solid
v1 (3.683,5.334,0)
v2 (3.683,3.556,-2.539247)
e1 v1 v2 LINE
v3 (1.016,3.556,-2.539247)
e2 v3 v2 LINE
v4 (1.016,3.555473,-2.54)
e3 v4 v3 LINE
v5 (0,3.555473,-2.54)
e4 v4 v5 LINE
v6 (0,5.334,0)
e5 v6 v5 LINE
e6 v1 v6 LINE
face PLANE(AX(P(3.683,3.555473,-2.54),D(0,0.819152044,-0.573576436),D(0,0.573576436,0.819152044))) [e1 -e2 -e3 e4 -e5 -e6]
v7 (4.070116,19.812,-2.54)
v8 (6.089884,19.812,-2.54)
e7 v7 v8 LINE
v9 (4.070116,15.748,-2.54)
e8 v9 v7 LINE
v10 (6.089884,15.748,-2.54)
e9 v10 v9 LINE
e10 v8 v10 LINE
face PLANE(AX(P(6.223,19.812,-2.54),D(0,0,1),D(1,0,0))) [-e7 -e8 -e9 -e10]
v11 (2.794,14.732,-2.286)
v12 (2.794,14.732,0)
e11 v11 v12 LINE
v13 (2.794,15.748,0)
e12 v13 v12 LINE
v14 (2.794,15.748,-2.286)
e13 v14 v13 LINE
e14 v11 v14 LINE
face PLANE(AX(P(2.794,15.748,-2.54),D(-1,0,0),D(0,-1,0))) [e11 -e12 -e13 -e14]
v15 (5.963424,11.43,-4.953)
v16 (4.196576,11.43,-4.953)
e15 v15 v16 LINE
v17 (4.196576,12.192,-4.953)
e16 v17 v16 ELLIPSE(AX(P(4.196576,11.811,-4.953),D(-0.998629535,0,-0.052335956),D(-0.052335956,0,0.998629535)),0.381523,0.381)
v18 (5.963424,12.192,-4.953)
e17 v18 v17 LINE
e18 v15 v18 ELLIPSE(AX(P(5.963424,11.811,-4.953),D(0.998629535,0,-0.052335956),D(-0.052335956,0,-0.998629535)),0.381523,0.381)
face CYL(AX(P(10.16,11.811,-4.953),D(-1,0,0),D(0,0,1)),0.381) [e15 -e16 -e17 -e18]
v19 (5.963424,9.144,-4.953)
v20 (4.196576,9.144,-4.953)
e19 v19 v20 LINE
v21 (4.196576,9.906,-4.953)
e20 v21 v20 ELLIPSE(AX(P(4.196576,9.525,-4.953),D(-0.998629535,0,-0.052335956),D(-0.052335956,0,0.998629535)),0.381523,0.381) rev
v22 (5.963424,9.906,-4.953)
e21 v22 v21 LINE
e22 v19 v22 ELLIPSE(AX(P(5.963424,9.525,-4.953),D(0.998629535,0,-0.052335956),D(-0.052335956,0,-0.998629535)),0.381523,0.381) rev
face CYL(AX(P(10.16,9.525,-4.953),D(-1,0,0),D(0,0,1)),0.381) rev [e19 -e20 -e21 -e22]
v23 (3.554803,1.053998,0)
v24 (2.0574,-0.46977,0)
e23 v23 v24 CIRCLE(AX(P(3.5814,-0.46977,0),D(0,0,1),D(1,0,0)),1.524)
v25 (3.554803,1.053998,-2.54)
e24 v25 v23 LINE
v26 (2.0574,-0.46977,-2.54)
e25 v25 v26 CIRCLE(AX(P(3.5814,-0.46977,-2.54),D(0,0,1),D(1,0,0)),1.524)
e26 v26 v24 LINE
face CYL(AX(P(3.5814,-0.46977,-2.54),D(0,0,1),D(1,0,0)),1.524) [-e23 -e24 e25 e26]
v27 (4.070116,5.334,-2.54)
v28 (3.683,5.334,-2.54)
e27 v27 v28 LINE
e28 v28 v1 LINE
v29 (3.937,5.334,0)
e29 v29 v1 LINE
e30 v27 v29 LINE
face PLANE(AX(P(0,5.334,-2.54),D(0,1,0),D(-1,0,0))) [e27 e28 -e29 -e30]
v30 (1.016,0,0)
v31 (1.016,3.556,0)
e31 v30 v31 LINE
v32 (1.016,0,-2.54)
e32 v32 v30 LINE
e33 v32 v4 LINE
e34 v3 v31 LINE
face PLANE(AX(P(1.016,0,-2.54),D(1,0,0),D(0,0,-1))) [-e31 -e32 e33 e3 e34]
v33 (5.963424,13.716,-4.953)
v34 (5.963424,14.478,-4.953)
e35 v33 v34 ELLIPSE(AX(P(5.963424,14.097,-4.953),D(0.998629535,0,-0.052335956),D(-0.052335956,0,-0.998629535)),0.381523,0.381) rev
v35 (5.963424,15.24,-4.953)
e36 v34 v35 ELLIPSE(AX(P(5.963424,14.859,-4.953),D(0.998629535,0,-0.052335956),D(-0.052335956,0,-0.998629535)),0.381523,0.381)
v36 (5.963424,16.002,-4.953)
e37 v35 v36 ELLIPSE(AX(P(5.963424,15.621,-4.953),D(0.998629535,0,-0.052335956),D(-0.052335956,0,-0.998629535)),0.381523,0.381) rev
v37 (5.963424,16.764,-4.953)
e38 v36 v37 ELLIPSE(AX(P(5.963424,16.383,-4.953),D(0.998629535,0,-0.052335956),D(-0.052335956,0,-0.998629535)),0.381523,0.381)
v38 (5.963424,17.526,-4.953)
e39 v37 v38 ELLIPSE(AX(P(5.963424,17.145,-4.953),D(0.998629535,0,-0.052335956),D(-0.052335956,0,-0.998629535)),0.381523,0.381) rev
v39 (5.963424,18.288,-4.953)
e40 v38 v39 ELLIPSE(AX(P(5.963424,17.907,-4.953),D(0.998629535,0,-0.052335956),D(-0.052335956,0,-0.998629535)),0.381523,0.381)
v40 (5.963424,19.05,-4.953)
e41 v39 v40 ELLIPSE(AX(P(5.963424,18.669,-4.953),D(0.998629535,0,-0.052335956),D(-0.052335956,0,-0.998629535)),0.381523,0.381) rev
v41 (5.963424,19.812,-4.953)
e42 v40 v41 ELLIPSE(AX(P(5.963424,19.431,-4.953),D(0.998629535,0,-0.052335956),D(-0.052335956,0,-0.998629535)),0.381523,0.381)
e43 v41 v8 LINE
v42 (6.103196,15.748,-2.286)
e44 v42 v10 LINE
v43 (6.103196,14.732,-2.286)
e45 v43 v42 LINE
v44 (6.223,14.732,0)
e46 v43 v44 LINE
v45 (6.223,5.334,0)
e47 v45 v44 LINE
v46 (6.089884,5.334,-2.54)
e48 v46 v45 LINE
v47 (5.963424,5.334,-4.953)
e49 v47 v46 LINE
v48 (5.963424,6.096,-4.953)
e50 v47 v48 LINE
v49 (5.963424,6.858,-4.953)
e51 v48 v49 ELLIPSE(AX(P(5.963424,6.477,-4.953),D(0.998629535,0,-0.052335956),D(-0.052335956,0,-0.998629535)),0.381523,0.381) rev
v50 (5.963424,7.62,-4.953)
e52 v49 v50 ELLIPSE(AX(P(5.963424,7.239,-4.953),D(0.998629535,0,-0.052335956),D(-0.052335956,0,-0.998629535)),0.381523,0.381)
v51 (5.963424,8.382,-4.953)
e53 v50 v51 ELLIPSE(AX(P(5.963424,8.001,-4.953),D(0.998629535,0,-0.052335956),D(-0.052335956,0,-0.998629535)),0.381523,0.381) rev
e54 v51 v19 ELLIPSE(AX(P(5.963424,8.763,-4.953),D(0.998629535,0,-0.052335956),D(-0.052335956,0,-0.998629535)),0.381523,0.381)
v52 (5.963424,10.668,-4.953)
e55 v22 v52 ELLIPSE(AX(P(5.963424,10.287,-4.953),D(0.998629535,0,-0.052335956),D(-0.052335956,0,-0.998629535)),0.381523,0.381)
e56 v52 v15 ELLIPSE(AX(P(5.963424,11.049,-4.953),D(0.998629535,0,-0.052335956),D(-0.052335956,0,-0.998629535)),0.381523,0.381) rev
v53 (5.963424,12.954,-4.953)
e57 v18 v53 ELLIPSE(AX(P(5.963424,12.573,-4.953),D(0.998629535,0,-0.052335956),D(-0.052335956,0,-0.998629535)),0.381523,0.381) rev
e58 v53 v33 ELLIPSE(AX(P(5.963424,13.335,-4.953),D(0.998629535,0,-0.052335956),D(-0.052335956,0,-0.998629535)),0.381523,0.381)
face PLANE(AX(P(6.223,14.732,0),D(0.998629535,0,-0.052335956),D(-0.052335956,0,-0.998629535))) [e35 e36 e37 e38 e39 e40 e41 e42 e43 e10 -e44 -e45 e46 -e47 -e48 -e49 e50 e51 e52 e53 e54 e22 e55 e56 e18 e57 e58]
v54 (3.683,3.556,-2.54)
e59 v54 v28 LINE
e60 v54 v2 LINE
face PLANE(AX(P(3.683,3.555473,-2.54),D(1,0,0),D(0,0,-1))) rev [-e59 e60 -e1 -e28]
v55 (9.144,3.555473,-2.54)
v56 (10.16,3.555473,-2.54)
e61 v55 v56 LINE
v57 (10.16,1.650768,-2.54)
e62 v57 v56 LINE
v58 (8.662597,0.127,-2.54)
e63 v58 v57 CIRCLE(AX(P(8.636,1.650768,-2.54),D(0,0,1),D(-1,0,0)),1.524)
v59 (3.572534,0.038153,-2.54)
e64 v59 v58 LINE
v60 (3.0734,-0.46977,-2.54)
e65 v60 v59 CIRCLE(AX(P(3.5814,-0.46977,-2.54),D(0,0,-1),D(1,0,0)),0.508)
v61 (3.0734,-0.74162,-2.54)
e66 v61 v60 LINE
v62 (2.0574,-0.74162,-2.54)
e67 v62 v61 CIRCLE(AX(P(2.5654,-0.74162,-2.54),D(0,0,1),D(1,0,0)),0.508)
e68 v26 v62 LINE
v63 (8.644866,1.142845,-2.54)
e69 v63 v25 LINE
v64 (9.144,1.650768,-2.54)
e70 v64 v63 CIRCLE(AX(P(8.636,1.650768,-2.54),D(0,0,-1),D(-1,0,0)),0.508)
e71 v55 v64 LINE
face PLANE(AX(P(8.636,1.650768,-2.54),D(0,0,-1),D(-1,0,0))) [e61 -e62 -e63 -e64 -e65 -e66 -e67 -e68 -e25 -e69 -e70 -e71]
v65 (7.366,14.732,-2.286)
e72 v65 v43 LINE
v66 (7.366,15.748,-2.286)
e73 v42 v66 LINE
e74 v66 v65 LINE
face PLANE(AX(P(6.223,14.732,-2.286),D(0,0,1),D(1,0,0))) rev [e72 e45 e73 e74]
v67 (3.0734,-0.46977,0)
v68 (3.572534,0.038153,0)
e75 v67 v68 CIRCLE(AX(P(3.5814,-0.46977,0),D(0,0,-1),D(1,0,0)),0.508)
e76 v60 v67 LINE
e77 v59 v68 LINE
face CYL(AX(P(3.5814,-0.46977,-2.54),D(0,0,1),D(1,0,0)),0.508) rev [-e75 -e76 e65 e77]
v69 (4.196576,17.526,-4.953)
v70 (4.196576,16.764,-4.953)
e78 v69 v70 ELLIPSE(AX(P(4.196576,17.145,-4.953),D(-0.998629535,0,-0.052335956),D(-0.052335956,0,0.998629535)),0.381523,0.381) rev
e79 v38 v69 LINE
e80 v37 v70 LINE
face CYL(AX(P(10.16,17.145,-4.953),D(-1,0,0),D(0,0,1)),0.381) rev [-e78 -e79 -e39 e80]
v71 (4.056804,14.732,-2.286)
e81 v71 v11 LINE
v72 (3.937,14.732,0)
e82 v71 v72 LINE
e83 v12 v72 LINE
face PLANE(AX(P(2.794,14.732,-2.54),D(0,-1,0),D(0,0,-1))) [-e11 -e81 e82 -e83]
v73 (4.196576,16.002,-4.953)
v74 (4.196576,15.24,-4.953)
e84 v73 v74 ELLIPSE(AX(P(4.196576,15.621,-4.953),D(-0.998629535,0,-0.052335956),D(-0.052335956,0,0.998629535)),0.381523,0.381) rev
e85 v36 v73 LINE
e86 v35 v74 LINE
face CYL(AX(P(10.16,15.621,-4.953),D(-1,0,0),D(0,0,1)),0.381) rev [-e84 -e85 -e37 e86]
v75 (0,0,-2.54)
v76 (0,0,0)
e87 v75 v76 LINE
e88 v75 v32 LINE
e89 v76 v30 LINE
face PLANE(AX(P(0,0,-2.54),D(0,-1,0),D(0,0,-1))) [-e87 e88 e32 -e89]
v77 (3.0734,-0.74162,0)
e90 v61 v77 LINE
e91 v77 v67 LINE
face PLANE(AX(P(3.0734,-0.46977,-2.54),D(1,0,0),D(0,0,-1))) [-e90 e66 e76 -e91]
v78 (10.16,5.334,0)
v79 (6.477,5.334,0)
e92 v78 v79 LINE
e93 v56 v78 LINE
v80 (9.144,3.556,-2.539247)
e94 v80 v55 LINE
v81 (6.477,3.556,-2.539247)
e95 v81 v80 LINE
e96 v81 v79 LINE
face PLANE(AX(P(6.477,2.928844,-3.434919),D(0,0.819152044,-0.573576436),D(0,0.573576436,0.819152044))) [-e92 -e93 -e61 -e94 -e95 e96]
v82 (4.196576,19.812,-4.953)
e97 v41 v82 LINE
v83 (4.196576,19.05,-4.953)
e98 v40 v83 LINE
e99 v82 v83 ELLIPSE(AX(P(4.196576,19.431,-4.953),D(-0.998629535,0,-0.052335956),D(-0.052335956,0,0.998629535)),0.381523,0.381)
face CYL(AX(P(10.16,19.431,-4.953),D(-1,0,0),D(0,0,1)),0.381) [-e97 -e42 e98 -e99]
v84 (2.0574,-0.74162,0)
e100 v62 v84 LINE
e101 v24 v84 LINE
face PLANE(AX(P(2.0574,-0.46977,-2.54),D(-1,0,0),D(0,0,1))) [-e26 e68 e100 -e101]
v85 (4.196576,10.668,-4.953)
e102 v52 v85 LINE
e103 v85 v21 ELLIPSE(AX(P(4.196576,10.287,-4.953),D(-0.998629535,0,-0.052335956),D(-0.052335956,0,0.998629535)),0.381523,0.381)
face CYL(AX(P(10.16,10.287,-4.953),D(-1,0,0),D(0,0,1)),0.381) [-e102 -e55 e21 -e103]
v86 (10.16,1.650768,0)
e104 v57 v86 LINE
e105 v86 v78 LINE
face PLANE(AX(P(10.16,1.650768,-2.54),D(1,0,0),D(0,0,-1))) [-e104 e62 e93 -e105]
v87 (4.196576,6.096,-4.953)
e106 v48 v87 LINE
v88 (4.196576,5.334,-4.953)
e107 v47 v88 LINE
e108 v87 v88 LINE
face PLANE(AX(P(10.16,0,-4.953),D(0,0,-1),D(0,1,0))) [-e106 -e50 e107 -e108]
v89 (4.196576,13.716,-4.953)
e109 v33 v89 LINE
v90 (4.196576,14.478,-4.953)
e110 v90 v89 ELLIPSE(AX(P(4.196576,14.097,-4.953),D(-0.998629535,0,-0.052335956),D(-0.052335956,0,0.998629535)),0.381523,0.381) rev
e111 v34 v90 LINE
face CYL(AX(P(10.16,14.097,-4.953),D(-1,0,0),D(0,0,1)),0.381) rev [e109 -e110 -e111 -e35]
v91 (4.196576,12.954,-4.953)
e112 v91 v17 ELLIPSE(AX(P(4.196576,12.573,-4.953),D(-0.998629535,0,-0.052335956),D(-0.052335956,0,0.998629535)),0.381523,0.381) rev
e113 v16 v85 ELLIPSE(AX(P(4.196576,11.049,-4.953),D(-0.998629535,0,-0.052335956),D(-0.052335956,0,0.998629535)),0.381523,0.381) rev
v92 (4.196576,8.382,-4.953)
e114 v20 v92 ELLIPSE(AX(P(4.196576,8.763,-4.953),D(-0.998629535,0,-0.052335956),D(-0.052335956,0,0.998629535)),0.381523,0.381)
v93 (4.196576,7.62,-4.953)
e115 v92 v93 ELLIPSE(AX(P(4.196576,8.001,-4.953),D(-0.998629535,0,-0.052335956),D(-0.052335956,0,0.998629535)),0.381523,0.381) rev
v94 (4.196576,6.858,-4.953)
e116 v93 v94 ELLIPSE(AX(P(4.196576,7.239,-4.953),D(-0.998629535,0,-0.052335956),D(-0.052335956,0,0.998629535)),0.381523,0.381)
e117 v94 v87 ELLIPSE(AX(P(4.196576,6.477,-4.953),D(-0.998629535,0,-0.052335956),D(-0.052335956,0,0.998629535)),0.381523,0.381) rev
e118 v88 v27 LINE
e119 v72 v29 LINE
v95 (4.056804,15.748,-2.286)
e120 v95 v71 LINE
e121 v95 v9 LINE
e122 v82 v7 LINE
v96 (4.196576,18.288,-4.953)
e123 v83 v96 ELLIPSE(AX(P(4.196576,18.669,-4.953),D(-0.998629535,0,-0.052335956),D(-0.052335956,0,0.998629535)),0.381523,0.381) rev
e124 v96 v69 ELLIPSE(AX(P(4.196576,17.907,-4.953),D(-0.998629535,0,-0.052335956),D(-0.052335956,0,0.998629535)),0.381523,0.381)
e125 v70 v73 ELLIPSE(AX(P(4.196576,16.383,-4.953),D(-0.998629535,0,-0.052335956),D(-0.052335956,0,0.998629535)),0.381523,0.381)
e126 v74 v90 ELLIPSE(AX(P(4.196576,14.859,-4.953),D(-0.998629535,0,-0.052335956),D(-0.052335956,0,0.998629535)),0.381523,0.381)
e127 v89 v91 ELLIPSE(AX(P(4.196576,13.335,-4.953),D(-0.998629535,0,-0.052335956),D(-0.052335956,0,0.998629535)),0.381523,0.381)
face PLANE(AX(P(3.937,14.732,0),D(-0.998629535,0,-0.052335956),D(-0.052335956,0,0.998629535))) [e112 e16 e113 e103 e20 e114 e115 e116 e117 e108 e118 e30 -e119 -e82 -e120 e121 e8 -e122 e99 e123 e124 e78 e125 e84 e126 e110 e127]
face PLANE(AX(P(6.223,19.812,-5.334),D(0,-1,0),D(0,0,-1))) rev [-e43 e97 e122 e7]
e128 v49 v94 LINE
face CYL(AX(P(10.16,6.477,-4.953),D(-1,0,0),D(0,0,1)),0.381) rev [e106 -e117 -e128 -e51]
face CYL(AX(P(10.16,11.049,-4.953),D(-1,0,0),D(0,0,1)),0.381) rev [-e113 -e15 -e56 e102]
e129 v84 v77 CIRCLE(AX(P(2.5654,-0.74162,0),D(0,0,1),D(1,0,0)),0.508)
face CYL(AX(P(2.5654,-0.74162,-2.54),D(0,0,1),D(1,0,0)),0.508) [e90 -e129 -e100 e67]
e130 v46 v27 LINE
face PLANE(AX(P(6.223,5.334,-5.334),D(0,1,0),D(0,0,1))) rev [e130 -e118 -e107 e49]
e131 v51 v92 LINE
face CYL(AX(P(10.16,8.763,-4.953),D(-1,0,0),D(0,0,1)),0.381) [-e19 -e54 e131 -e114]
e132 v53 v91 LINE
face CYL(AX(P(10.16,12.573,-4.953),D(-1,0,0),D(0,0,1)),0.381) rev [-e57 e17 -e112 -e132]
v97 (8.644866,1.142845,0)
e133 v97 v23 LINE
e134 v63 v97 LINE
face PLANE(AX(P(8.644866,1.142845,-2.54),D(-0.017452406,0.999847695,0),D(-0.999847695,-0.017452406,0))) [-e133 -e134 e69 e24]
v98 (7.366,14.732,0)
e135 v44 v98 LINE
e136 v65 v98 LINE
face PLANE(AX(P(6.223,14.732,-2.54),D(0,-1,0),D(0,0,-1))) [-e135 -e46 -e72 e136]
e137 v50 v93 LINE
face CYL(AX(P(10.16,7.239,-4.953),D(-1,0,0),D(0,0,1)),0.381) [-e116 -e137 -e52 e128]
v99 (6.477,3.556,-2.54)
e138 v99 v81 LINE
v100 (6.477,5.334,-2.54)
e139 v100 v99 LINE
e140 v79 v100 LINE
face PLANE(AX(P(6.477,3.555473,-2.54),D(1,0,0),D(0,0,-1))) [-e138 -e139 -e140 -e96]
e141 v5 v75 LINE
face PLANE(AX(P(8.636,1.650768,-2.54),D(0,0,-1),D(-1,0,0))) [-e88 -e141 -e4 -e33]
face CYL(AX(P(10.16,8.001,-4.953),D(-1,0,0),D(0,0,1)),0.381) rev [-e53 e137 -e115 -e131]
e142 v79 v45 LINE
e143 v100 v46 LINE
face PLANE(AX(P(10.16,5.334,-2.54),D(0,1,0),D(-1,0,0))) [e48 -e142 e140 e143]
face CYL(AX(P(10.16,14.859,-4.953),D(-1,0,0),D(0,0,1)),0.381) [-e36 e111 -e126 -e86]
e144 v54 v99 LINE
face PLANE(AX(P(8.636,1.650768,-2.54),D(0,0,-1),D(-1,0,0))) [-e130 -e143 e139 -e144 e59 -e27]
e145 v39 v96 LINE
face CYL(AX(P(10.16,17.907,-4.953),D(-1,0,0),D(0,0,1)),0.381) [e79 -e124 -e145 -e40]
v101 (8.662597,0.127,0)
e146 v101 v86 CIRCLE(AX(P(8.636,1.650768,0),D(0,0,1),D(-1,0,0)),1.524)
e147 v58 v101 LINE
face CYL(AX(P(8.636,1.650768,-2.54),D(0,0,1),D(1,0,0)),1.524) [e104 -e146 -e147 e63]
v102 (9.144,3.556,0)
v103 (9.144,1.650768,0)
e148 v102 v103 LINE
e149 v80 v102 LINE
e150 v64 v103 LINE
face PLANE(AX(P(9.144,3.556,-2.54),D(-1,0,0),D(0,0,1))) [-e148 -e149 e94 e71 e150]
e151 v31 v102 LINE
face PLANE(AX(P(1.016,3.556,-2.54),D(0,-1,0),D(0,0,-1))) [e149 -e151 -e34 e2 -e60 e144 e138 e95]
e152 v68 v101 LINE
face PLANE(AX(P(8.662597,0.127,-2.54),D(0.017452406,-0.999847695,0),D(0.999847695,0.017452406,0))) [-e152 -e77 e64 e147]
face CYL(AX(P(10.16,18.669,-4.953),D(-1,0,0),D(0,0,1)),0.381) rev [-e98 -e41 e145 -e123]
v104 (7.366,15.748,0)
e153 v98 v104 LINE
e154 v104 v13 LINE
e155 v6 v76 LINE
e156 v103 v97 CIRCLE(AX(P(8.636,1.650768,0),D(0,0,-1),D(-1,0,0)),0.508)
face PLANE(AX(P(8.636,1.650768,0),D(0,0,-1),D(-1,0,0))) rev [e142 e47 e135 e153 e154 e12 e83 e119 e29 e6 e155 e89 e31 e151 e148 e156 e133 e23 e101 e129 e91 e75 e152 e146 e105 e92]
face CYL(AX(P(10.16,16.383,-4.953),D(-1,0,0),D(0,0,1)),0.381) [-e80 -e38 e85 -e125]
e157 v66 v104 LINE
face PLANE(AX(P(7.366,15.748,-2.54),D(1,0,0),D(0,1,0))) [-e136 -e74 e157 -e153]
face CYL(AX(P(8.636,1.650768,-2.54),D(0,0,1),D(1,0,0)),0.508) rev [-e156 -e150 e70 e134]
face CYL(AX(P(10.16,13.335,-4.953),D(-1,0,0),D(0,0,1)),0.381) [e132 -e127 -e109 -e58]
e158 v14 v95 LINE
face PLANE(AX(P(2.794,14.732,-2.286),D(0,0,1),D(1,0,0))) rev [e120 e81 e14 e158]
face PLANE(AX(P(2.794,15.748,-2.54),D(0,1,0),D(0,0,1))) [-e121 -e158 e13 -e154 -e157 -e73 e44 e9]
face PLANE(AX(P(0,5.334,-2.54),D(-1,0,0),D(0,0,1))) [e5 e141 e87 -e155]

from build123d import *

# Parameters (mm, degrees)
BOSS_EXTRUDE1_DEPTH = 2.54
CUT_EXTRUDE2_DEPTH  = 3.683
CUT_EXTRUDE4_START  = 10.16
CUT_EXTRUDE4_DEPTH  = 3.683
SKETCH2_W           = 2.286
SKETCH2_H           = 14.478
BOSS_EXTRUDE2_DEPTH = 2.794
SKETCH3_W           = 1.143
SKETCH3_H           = 1.016
CUT_EXTRUDE5_DEPTH  = 0.254
DRAFT2_START        = 5.334
DRAFT2_DEPTH        = 14.478
DRAFT2_2_DEPTH      = 9.398
CUT_EXTRUDE6_DEPTH  = 23.895250599


# Read off the part's stored shape, not the designer's step: Draft2
with BuildPart() as part:
    # Model → Boss-Extrude1 (new body)
    with BuildSketch(Plane.XY):
        with BuildLine():
            Line((2.794, 15.748), (7.366, 15.748))
            Line((7.366, 15.748), (7.366, 14.732))
            Line((7.366, 14.732), (6.223, 14.732))
            Line((6.223, 14.732), (6.223, 5.334))
            Line((6.223, 5.334), (10.16, 5.334))
            Line((10.16, 5.334), (10.16, 1.650767887))
            ThreePointArc((10.16, 1.650767887), (9.722993685, 0.582582169), (8.662597467, 0.127))
            Line((8.662597467, 0.127), (3.572534178, 0.038152615))
            ThreePointArc((3.572534178, 0.038152615), (3.219068772, -0.113708108), (3.0734, -0.469770014))
            Line((3.0734, -0.469770014), (3.0734, -0.741620434))
            ThreePointArc((3.0734, -0.741620434), (2.5654, -1.249620434), (2.0574, -0.741620434))
            Line((2.0574, -0.741620434), (2.0574, -0.469770014))
            ThreePointArc((2.0574, -0.469770014), (2.494406315, 0.598415704), (3.554802533, 1.053997873))
            Line((3.554802533, 1.053997873), (8.644865822, 1.142845258))
            ThreePointArc((8.644865822, 1.142845258), (8.998331228, 1.294705981), (9.144, 1.650767887))
            Line((9.144, 1.650767887), (9.144, 3.556))
            Line((9.144, 3.556), (1.016, 3.556))
            Line((1.016, 3.556), (1.016, 0))
            Line((1.016, 0), (0, 0))
            Line((0, 0), (0, 5.334))
            Line((0, 5.334), (3.937, 5.334))
            Line((3.937, 5.334), (3.937, 14.732))
            Line((3.937, 14.732), (2.794, 14.732))
            Line((2.794, 14.732), (2.794, 15.748))
        make_face()
    extrude(amount=-BOSS_EXTRUDE1_DEPTH)

    # Sketch1 → Cut-Extrude2 (cut)
    with BuildSketch(Plane(origin=(0, 0, 0), x_dir=(0, 0, -1), z_dir=(1, 0, 0))):
        Polygon((0, 5.334), (2.54, 5.334), (2.54, 3.555472853), align=None)
    extrude(amount=CUT_EXTRUDE2_DEPTH, mode=Mode.SUBTRACT)

    # Sketch1<3> → Cut-Extrude4 (cut)
    with BuildSketch(Plane(origin=(0, 0, 0), x_dir=(0, 0, -1), z_dir=(1, 0, 0)).offset(CUT_EXTRUDE4_START)):
        Polygon((0, 5.334), (2.54, 5.334), (2.54, 3.555472853), align=None)
    extrude(amount=-CUT_EXTRUDE4_DEPTH, mode=Mode.SUBTRACT)

    # Sketch2 → Boss-Extrude2 (add)
    with BuildSketch(Plane(origin=(0, 0, -2.54), x_dir=(-1, 0, 0), z_dir=(0, 0, -1))):
        with Locations((-5.08, 12.573)):
            Rectangle(SKETCH2_W, SKETCH2_H)
    extrude(amount=BOSS_EXTRUDE2_DEPTH)

    # Sketch3 → Cut-Extrude5 (cut)
    with BuildSketch(Plane(origin=(0, 0, -2.54), x_dir=(-1, 0, 0), z_dir=(0, 0, -1))):
        with Locations((-6.7945, 15.24)):
            Rectangle(SKETCH3_W, SKETCH3_H)
        with Locations((-3.3655, 15.24)):
            Rectangle(SKETCH3_W, SKETCH3_H)
    extrude(amount=-CUT_EXTRUDE5_DEPTH, mode=Mode.SUBTRACT)

    # Draft2 outline → Draft2 (cut)
    with BuildSketch(Plane(origin=(0, 0, 0), x_dir=(1, 0, 0), z_dir=(0, 1, 0)).offset(DRAFT2_START)):
        Polygon((4.216543095, 5.334), (3.937, 5.334), (3.937, 2.286), (4.056804183, 2.286), align=None)
        Polygon((6.223, 5.334), (5.943456905, 5.334), (6.103195817, 2.286), (6.223, 2.286), align=None)
    extrude(amount=DRAFT2_DEPTH, mode=Mode.SUBTRACT)

    # Draft2 2 outline → Draft2 2 (cut)
    with BuildSketch(Plane(origin=(0, 0, 0), x_dir=(1, 0, 0), z_dir=(0, 1, 0)).offset(DRAFT2_START)):
        Polygon((3.937, 0), (4.056804184, 2.286), (3.937, 2.286), align=None)
        Polygon((6.223, 2.286), (6.103195817, 2.286), (6.223, 0), align=None)
    extrude(amount=DRAFT2_2_DEPTH, mode=Mode.SUBTRACT)

    # Sketch4 → Cut-Extrude6 (cut, through all)
    with BuildSketch(Plane(origin=(0, 0, 0), x_dir=(0, 0, -1), z_dir=(1, 0, 0))):
        with BuildLine():
            ThreePointArc((4.953, 19.812), (5.222407684, 19.700407684), (5.334, 19.431))
            Line((5.334, 19.431), (5.334, 19.812))
            Line((5.334, 19.812), (4.953, 19.812))
        make_face()
        with BuildLine():
            ThreePointArc((4.953, 18.288), (5.222407684, 18.176407684), (5.334, 17.907))
            Line((5.334, 17.907), (5.334, 19.431))
            ThreePointArc((5.334, 19.431), (5.222407684, 19.161592316), (4.953, 19.05))
            ThreePointArc((4.953, 19.05), (4.683592316, 18.938407684), (4.572, 18.669))
            ThreePointArc((4.572, 18.669), (4.683592316, 18.399592316), (4.953, 18.288))
        make_face()
        with BuildLine():
            ThreePointArc((4.953, 16.764), (5.222407684, 16.652407684), (5.334, 16.383))
            Line((5.334, 16.383), (5.334, 17.907))
            ThreePointArc((5.334, 17.907), (5.222407684, 17.637592316), (4.953, 17.526))
            ThreePointArc((4.953, 17.526), (4.683592316, 17.414407684), (4.572, 17.145))
            ThreePointArc((4.572, 17.145), (4.683592316, 16.875592316), (4.953, 16.764))
        make_face()
        with BuildLine():
            ThreePointArc((4.953, 15.24), (5.222407684, 15.128407684), (5.334, 14.859))
            Line((5.334, 14.859), (5.334, 16.383))
            ThreePointArc((5.334, 16.383), (5.222407684, 16.113592316), (4.953, 16.002))
            ThreePointArc((4.953, 16.002), (4.683592316, 15.890407684), (4.572, 15.621))
            ThreePointArc((4.572, 15.621), (4.683592316, 15.351592316), (4.953, 15.24))
        make_face()
        with BuildLine():
            ThreePointArc((4.953, 13.716), (5.222407684, 13.604407684), (5.334, 13.335))
            Line((5.334, 13.335), (5.334, 14.859))
            ThreePointArc((5.334, 14.859), (5.222407684, 14.589592316), (4.953, 14.478))
            ThreePointArc((4.953, 14.478), (4.683592316, 14.366407684), (4.572, 14.097))
            ThreePointArc((4.572, 14.097), (4.683592316, 13.827592316), (4.953, 13.716))
        make_face()
        with BuildLine():
            ThreePointArc((4.953, 12.192), (5.222407684, 12.080407684), (5.334, 11.811))
            Line((5.334, 11.811), (5.334, 13.335))
            ThreePointArc((5.334, 13.335), (5.222407684, 13.065592316), (4.953, 12.954))
            ThreePointArc((4.953, 12.954), (4.683592316, 12.842407684), (4.572, 12.573))
            ThreePointArc((4.572, 12.573), (4.683592316, 12.303592316), (4.953, 12.192))
        make_face()
        with BuildLine():
            ThreePointArc((4.953, 10.668), (5.222407684, 10.556407684), (5.334, 10.287))
            Line((5.334, 10.287), (5.334, 11.811))
            ThreePointArc((5.334, 11.811), (5.222407684, 11.541592316), (4.953, 11.43))
            ThreePointArc((4.953, 11.43), (4.683592316, 11.318407684), (4.572, 11.049))
            ThreePointArc((4.572, 11.049), (4.683592316, 10.779592316), (4.953, 10.668))
        make_face()
        with BuildLine():
            ThreePointArc((4.953, 9.144), (5.222407684, 9.032407684), (5.334, 8.763))
            Line((5.334, 8.763), (5.334, 10.287))
            ThreePointArc((5.334, 10.287), (5.222407684, 10.017592316), (4.953, 9.906))
            ThreePointArc((4.953, 9.906), (4.683592316, 9.794407684), (4.572, 9.525))
            ThreePointArc((4.572, 9.525), (4.683592316, 9.255592316), (4.953, 9.144))
        make_face()
        with BuildLine():
            ThreePointArc((4.953, 7.62), (5.222407684, 7.508407684), (5.334, 7.239))
            Line((5.334, 7.239), (5.334, 8.763))
            ThreePointArc((5.334, 8.763), (5.222407684, 8.493592316), (4.953, 8.382))
            ThreePointArc((4.953, 8.382), (4.683592316, 8.270407684), (4.572, 8.001))
            ThreePointArc((4.572, 8.001), (4.683592316, 7.731592316), (4.953, 7.62))
        make_face()
        with BuildLine():
            ThreePointArc((4.572, 6.477), (4.683592316, 6.207592316), (4.953, 6.096))
            Line((4.953, 6.096), (4.953, 3.556))
            Line((4.953, 3.556), (5.334, 3.556))
            Line((5.334, 3.556), (5.334, 7.239))
            ThreePointArc((5.334, 7.239), (5.222407684, 6.969592316), (4.953, 6.858))
            ThreePointArc((4.953, 6.858), (4.683592316, 6.746407684), (4.572, 6.477))
        make_face()
    extrude(amount=CUT_EXTRUDE6_DEPTH, mode=Mode.SUBTRACT)


solid = part.part
